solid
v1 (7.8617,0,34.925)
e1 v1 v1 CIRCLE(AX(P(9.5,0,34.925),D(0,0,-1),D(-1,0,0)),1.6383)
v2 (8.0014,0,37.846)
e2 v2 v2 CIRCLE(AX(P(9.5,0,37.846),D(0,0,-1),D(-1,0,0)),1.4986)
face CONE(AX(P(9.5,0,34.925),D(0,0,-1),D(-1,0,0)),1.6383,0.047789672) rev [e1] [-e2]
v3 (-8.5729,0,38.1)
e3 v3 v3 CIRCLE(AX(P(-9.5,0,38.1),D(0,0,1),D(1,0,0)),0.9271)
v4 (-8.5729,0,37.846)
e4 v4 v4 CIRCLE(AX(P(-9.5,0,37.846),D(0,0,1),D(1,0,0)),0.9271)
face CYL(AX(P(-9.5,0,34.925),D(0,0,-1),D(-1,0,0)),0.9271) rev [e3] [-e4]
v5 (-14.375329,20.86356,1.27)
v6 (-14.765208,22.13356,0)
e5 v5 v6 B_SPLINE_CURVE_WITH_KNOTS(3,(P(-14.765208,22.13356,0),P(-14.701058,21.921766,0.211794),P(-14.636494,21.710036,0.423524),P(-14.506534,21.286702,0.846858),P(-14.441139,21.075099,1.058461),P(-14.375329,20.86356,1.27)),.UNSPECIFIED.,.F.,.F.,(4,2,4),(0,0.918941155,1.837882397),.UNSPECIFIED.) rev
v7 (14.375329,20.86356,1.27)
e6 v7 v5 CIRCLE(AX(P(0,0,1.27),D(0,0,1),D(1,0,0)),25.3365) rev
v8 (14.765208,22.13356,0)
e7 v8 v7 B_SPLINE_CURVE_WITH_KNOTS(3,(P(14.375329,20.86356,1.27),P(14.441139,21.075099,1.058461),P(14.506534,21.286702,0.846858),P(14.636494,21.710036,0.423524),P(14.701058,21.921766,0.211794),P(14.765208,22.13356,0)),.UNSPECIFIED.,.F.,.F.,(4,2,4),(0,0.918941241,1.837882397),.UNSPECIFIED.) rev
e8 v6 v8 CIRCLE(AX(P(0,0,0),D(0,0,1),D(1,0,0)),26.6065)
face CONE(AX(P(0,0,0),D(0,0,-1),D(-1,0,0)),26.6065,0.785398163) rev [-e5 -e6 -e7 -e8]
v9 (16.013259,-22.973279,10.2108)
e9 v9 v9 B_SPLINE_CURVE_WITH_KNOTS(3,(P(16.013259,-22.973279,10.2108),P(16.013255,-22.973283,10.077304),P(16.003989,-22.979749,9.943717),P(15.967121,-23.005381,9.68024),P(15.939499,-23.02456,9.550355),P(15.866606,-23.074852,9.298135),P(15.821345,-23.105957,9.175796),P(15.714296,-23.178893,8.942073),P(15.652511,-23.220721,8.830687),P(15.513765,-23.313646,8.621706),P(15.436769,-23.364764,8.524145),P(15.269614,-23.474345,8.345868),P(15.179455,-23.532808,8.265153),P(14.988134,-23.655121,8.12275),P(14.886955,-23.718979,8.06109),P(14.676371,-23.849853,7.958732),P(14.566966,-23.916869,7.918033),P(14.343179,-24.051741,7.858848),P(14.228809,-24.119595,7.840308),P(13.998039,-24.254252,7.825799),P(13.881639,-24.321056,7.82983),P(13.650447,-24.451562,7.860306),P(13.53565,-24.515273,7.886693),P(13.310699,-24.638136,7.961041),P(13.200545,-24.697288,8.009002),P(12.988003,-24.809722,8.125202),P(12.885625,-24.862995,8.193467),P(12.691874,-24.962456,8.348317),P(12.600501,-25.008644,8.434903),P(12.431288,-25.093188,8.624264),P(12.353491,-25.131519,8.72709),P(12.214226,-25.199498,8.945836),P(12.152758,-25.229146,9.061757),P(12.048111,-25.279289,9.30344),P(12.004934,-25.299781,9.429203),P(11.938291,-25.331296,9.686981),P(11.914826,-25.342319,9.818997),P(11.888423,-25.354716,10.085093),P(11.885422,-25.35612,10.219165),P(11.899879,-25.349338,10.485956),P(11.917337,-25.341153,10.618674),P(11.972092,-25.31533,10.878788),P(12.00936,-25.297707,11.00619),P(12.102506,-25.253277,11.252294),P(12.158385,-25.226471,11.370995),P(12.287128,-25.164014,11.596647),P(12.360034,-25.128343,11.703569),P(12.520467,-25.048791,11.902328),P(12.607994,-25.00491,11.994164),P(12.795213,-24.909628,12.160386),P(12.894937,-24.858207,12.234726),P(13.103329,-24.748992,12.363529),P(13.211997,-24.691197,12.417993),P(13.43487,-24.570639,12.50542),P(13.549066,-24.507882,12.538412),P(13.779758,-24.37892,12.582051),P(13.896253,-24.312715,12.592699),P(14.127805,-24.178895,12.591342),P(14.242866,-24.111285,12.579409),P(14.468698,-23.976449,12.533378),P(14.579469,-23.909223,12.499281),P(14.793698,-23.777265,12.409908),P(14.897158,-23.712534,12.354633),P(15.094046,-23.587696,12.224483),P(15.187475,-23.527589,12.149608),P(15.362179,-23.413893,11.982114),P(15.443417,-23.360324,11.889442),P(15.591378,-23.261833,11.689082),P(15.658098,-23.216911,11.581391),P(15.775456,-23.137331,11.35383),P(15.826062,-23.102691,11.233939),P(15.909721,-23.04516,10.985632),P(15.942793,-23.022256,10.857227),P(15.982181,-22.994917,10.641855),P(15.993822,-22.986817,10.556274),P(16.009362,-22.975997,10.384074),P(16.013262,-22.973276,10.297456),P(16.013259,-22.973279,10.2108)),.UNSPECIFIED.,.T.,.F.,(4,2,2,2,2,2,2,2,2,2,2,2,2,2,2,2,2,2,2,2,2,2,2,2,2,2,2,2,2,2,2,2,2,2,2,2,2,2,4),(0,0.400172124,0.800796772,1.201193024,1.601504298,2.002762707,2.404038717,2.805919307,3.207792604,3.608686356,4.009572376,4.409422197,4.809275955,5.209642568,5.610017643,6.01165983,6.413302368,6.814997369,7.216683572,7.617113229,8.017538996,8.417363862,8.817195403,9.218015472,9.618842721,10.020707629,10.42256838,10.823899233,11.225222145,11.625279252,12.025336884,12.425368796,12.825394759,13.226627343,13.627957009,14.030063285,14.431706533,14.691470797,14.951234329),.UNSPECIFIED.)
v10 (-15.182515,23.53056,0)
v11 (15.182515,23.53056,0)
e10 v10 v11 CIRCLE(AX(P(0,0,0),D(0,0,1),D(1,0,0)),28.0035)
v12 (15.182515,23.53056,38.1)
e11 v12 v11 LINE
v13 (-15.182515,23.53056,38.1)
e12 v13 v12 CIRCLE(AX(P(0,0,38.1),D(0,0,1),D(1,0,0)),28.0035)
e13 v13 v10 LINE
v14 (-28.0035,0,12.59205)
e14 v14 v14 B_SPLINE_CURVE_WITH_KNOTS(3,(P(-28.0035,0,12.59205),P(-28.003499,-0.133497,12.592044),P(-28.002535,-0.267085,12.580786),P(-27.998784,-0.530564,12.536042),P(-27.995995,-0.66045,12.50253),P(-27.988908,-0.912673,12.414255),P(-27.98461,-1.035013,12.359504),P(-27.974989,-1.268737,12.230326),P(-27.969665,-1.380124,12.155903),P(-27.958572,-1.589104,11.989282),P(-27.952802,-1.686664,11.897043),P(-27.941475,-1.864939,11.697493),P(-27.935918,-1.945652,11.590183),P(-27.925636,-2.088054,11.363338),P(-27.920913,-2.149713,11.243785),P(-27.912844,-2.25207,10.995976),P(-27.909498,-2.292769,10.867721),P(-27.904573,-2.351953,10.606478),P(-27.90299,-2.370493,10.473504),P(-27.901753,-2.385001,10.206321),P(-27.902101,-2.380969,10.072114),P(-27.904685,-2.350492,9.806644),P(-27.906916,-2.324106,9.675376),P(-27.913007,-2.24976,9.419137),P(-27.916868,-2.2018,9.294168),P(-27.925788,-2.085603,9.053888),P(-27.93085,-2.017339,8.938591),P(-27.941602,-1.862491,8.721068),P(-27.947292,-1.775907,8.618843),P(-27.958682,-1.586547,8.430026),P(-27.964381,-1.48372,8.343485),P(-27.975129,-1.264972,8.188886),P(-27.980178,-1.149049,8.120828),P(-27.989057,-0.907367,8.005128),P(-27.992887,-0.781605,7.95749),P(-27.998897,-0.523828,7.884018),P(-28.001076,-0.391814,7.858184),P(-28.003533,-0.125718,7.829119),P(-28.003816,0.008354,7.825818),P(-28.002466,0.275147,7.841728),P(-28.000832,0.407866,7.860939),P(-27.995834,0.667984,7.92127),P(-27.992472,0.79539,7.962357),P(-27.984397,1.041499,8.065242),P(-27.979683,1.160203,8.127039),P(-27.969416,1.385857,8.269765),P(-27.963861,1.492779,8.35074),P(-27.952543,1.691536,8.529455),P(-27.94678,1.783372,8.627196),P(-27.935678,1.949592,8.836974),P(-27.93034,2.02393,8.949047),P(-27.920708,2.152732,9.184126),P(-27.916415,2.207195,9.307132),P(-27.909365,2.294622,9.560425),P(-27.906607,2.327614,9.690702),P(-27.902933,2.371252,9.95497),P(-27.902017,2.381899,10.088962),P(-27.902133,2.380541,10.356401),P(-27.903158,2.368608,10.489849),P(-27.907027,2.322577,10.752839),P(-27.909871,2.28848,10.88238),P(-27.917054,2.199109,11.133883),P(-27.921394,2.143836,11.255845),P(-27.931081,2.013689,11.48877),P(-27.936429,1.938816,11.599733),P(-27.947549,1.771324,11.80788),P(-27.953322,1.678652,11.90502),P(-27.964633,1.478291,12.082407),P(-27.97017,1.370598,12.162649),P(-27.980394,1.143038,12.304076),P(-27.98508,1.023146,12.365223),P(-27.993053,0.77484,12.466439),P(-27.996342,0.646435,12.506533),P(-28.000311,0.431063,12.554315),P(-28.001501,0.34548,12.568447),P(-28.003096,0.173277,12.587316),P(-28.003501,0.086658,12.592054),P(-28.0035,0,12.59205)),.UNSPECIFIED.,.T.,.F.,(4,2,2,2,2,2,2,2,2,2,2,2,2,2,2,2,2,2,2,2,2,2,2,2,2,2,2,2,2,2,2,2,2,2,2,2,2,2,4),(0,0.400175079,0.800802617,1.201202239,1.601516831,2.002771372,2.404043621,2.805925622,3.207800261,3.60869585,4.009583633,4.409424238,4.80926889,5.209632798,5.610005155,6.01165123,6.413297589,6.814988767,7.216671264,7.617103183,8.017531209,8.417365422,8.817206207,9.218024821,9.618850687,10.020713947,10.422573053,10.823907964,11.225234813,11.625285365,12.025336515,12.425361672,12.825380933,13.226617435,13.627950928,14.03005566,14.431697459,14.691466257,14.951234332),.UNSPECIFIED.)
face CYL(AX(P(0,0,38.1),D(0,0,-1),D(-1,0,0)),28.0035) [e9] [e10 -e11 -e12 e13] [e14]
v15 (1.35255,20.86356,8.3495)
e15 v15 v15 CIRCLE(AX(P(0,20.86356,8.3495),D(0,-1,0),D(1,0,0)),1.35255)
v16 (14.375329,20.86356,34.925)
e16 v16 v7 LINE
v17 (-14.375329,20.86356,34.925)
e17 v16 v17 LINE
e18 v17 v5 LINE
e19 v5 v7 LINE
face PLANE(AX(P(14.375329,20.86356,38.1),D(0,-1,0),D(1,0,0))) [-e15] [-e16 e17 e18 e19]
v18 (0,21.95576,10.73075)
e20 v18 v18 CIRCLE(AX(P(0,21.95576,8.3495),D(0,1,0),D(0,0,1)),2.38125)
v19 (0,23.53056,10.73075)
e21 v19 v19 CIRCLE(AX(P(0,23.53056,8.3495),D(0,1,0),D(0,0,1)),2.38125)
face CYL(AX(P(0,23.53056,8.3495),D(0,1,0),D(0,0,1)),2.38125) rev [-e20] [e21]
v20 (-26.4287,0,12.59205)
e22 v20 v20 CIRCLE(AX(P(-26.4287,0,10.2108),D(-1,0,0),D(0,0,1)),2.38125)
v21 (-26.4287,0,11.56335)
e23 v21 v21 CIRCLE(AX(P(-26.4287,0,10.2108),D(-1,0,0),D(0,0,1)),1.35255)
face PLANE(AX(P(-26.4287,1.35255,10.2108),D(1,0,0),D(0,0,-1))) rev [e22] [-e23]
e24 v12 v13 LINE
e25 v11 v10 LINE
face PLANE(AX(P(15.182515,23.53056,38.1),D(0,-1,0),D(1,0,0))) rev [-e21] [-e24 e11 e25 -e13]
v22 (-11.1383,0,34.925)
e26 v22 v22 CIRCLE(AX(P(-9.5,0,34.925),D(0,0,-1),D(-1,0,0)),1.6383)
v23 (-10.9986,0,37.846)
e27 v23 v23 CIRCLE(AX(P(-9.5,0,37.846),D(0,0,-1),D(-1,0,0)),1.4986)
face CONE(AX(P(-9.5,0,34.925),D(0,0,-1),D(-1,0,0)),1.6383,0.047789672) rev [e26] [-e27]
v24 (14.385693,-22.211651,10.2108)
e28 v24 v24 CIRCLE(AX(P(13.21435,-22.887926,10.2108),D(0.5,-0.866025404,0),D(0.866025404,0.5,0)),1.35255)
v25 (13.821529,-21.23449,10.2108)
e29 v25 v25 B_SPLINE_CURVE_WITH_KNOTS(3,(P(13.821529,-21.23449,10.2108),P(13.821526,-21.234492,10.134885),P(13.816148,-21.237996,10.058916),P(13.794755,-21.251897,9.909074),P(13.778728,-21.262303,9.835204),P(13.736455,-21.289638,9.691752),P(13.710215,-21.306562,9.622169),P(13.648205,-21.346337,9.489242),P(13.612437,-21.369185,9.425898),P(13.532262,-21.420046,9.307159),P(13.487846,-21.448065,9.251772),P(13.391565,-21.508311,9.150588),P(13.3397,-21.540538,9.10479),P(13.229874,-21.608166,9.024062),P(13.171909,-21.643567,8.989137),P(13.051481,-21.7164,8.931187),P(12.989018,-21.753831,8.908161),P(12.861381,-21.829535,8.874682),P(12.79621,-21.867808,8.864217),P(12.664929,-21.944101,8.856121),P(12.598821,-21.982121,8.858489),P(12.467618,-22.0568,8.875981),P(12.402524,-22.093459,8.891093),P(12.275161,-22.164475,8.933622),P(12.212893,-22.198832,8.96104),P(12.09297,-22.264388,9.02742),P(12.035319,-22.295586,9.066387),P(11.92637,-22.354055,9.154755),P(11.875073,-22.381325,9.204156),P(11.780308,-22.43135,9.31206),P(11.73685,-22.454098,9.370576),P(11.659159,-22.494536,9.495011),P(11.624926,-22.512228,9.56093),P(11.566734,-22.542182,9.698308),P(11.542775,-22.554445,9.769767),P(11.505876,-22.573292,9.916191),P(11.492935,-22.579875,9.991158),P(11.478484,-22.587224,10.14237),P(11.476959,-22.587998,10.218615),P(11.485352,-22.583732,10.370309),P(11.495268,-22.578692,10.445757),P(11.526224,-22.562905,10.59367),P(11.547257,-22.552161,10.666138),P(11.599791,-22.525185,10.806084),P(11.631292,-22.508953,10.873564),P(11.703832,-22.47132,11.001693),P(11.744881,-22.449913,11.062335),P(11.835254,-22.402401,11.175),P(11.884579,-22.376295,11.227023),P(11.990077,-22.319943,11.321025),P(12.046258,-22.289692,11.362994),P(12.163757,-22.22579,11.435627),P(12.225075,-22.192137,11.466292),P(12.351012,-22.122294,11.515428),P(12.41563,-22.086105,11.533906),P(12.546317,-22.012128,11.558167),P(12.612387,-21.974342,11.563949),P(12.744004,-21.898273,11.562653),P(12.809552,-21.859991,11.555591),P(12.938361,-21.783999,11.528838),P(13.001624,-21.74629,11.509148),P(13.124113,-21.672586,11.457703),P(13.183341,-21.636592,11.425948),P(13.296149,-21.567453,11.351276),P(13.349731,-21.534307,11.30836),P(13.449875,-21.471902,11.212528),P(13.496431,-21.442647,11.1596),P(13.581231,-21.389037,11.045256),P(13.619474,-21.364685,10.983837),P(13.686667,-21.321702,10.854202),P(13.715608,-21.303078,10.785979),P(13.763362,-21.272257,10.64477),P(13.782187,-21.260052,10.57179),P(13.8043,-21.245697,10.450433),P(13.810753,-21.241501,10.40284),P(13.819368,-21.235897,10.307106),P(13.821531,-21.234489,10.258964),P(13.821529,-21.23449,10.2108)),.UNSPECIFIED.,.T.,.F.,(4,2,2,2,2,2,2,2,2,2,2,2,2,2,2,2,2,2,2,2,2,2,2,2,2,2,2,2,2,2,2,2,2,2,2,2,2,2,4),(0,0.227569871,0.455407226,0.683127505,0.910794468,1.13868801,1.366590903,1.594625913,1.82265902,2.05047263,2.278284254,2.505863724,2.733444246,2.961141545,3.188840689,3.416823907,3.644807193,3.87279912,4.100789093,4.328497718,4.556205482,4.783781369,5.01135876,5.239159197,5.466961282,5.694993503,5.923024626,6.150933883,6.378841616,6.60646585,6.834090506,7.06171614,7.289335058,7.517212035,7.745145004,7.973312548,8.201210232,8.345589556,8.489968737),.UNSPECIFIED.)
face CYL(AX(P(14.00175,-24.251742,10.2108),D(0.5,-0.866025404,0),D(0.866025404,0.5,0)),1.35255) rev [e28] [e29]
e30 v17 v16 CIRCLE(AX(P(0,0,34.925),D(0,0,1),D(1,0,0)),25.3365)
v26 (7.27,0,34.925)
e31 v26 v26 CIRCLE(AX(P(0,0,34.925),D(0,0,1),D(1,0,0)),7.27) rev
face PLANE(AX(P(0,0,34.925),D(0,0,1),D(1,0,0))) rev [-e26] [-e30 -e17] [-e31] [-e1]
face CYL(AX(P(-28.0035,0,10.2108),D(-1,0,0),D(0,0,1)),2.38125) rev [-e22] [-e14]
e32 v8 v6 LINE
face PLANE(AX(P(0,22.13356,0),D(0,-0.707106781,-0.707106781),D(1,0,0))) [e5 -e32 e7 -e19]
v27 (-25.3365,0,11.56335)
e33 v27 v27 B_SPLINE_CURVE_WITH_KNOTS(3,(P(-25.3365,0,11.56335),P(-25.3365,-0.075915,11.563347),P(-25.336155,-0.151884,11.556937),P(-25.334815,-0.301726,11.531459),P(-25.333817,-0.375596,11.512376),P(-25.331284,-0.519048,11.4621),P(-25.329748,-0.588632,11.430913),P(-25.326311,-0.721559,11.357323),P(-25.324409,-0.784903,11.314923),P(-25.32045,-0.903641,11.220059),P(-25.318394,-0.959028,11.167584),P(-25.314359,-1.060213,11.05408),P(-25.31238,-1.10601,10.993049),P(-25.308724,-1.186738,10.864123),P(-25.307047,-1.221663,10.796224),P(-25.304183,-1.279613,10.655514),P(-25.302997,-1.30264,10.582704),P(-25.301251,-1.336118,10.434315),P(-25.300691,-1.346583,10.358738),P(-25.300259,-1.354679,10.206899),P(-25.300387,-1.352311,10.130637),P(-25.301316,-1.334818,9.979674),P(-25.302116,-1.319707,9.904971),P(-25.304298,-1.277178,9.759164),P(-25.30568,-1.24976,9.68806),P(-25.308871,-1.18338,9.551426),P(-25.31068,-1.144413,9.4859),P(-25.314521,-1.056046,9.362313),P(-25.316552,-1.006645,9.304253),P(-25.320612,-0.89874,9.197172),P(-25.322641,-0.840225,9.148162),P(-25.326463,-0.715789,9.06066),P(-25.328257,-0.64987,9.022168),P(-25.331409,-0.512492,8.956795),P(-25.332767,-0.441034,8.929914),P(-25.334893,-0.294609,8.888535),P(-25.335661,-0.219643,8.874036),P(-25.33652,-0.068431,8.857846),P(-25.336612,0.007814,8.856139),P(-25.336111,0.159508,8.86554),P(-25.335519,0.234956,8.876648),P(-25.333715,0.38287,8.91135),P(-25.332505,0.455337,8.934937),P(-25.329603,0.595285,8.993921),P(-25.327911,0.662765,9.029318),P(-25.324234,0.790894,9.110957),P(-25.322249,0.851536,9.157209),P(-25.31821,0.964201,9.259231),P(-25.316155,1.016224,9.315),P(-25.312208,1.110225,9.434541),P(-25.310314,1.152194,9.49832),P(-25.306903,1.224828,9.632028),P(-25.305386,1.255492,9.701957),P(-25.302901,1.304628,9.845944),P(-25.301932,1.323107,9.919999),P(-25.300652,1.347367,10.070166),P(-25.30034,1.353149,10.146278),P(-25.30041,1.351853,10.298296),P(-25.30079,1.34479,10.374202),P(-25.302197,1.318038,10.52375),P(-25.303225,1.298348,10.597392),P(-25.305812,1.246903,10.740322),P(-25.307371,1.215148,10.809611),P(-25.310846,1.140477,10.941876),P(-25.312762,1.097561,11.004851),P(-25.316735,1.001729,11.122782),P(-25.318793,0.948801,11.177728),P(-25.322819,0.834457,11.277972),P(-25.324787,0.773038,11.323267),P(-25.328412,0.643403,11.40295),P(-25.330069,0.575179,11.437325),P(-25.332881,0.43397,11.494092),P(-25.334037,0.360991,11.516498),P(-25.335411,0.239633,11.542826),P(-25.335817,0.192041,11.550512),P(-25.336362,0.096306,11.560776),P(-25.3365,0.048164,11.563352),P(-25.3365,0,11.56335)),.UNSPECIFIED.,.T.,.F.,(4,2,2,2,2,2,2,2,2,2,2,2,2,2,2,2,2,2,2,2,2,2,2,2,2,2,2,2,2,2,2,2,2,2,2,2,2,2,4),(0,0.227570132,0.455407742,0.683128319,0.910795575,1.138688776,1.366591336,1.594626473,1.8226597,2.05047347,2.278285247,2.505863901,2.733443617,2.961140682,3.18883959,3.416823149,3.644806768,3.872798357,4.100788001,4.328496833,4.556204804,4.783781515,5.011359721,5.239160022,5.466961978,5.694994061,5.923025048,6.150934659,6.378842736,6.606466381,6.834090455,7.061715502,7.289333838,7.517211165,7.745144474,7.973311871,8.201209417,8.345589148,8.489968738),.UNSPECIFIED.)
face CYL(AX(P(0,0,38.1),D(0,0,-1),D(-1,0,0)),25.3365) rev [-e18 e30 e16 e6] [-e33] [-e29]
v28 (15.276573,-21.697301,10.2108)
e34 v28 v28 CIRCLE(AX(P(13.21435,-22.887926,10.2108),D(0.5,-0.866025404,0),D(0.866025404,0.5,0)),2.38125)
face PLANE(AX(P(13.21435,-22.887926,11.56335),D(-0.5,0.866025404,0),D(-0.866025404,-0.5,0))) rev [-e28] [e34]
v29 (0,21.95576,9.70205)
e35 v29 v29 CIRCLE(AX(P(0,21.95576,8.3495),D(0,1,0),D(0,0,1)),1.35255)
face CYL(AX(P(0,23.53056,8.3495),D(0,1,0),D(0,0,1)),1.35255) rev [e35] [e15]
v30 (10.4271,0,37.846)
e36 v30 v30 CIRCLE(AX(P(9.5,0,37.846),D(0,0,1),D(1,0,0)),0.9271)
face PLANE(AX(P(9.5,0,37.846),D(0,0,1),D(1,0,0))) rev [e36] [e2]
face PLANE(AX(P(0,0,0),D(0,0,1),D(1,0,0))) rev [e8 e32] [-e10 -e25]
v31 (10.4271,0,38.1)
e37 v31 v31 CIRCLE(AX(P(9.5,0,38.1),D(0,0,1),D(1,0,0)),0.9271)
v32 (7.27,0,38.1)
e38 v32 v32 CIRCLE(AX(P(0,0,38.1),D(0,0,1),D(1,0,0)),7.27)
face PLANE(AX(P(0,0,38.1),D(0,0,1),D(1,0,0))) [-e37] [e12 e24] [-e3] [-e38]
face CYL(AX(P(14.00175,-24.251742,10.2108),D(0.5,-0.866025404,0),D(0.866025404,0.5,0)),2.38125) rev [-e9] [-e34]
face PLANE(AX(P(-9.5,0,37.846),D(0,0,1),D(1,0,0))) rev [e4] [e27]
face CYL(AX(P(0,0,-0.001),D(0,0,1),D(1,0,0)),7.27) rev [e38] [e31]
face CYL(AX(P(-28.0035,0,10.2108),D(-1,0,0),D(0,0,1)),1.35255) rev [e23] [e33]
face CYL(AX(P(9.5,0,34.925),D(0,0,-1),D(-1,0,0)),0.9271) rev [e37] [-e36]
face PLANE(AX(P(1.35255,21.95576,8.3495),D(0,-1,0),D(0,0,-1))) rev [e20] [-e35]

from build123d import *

# Parameters (mm, degrees)
BOSS_EXTRUDE1_DEPTH                             = 38.1
BOSS_EXTRUDE2_START                             = -3.175
BOSS_EXTRUDE2_DEPTH                             = 3.175
CBORE_FOR_2_PAN_HEAD_MACHINE_SCREW1_D           = 2.7051
CBORE_FOR_2_PAN_HEAD_MACHINE_SCREW1_DEPTH       = 2.667
CBORE_FOR_2_PAN_HEAD_MACHINE_SCREW1_CBORE_D     = 4.7625
CBORE_FOR_2_PAN_HEAD_MACHINE_SCREW1_CBORE_DEPTH = 1.5748
CBORE_START                                     = 26.4287
CBORE_FOR_2_PAN_HEAD_MACHINE_SCREW2_OUT_R       = 2.38125
CBORE_FOR_2_PAN_HEAD_MACHINE_SCREW2_DEPTH       = 1.574800075
CBORE_START_2                                   = 25.300372244
CBORE_FOR_2_PAN_HEAD_MACHINE_SCREW2_2_O_R       = 1.35255
CBORE_FOR_2_PAN_HEAD_MACHINE_SCREW2_2_DEPTH     = 1.128327756
CBORE_START_3                                   = -28.003500101
CBORE_FOR_2_PAN_HEAD_MACHINE_SCREW3_OUT_R       = 2.38125
CBORE_FOR_2_PAN_HEAD_MACHINE_SCREW3_DEPTH       = 1.574800101
CBORE_START_4                                   = -26.4287
CBORE_FOR_2_PAN_HEAD_MACHINE_SCREW3_2_O_R       = 1.35255
CBORE_FOR_2_PAN_HEAD_MACHINE_SCREW3_2_DEPTH     = 1.128327733
CUT_EXTRUDE1_REACH                              = 56.955
SKETCH20_R                                      = 7.27
HOLE1_AT_2_COUNT                                = 2
HOLE1_AT_2_PITCH                                = 19
F_0_CLEARANCE_HOLE1_D                           = 1.8542
CHAMFER1_SIZE                                   = 1.27


# Read off the part's stored shape, not the designer's step: CBORE for #2 Pan Head Machine Screw2, CBORE for #2 Pan Head Machine Screw3
with BuildPart() as part:
    # Sketch1 → Boss-Extrude1 (new body)
    with BuildSketch(Plane.XY):
        with BuildLine():
            Line((15.182514888, 23.53056), (-15.182514888, 23.53056))
            ThreePointArc((-15.182514888, 23.53056), (0, -28.0035), (15.182514888, 23.53056))
        make_face()
        with BuildLine():
            Line((14.375329435, 20.86356), (-14.375329435, 20.86356))
            ThreePointArc((-14.375329435, 20.86356), (0, -25.3365), (14.375329435, 20.86356))
        make_face(mode=Mode.SUBTRACT)
    extrude(amount=BOSS_EXTRUDE1_DEPTH)

    # Sketch10 → Boss-Extrude2 (add)
    with BuildSketch(Plane.XY.offset(38.1).offset(BOSS_EXTRUDE2_START)):
        with BuildLine():
            Line((15.182514888, 23.53056), (-15.182514888, 23.53056))
            ThreePointArc((-15.182514888, 23.53056), (0, -28.0035), (15.182514888, 23.53056))
        make_face()
    extrude(amount=BOSS_EXTRUDE2_DEPTH)

    # CBORE for #2 Pan Head Machine Screw1
    with Locations(Plane(origin=(-7.747359339, 23.53056, 10.2108), x_dir=(0, 0, -1), z_dir=(0, 1, 0))):
        with Locations((1.8613, -7.747359339)):
            CounterBoreHole(CBORE_FOR_2_PAN_HEAD_MACHINE_SCREW1_D / 2, CBORE_FOR_2_PAN_HEAD_MACHINE_SCREW1_CBORE_D / 2, CBORE_FOR_2_PAN_HEAD_MACHINE_SCREW1_CBORE_DEPTH, depth=CBORE_FOR_2_PAN_HEAD_MACHINE_SCREW1_DEPTH)

    # CBORE for #2 Pan Head Machine Screw2 out → CBORE for #2 Pan Head Machine Screw2 (cut)
    with BuildSketch(Plane(origin=(0, 0, 0), x_dir=(0.8660254037844416, 0.4999999999999948, 0), z_dir=(0.4999999999999948, -0.8660254037844417, 0)).offset(CBORE_START)):
        with Locations((0, 10.2108)):
            Circle(CBORE_FOR_2_PAN_HEAD_MACHINE_SCREW2_OUT_R)
    extrude(amount=CBORE_FOR_2_PAN_HEAD_MACHINE_SCREW2_DEPTH, mode=Mode.SUBTRACT)

    # CBORE for _2 Pan Head Machine Screw2 2 o → CBORE for _2 Pan Head Machine Screw2 2 (cut)
    with BuildSketch(Plane(origin=(0, 0, 0), x_dir=(0.8660254037844416, 0.4999999999999948, 0), z_dir=(0.4999999999999948, -0.8660254037844417, 0)).offset(CBORE_START_2)):
        with Locations((0, 10.2108)):
            Circle(CBORE_FOR_2_PAN_HEAD_MACHINE_SCREW2_2_O_R)
    extrude(amount=CBORE_FOR_2_PAN_HEAD_MACHINE_SCREW2_2_DEPTH, mode=Mode.SUBTRACT)

    # CBORE for #2 Pan Head Machine Screw3 out → CBORE for #2 Pan Head Machine Screw3 (cut)
    with BuildSketch(Plane.YZ.offset(CBORE_START_3)):
        with Locations((0, 10.2108)):
            Circle(CBORE_FOR_2_PAN_HEAD_MACHINE_SCREW3_OUT_R)
    extrude(amount=CBORE_FOR_2_PAN_HEAD_MACHINE_SCREW3_DEPTH, mode=Mode.SUBTRACT)

    # CBORE for _2 Pan Head Machine Screw3 2 o → CBORE for _2 Pan Head Machine Screw3 2 (cut)
    with BuildSketch(Plane.YZ.offset(CBORE_START_4)):
        with Locations((0, 10.2108)):
            Circle(CBORE_FOR_2_PAN_HEAD_MACHINE_SCREW3_2_O_R)
    extrude(amount=CBORE_FOR_2_PAN_HEAD_MACHINE_SCREW3_2_DEPTH, mode=Mode.SUBTRACT)

    # Sketch20 → Cut-Extrude1 (cut, up to next)
    with BuildSketch(Plane.XY.offset(38.1), mode=Mode.PRIVATE) as cut_extrude1_sk1:
        Circle(SKETCH20_R)
    cut_extrude1_tool1 = extrude(cut_extrude1_sk1.sketch, amount=-CUT_EXTRUDE1_REACH, mode=Mode.PRIVATE) & part.part
    add(cut_extrude1_tool1.solids().sort_by_distance((0, 0, 38.1))[0], mode=Mode.SUBTRACT)

    # Sketch22 → Hole1 (revolve, cut)
    with BuildSketch(Plane(origin=(9.5, 0, 34.925), x_dir=(0, 1, 0), z_dir=(1, 0, 0))):
        Polygon((0, 0), (0, 2.921), (1.4986, 2.921), (1.6383, 0), align=None)
    hole1 = revolve(axis=Axis((9.5, 0, 144.925), (0, 0, -1)), mode=Mode.SUBTRACT)

    # Hole1 at 2: Hole1 ×2
    with Locations(*[(-i * HOLE1_AT_2_PITCH, 0, 0) for i in range(1, HOLE1_AT_2_COUNT)]):
        add(hole1, mode=Mode.SUBTRACT)

    # #0 Clearance Hole1 (through all)
    with Locations(Plane(origin=(0, 0, 34.925), x_dir=(-1, 0, 0), z_dir=(0, 0, -1))):
        with Locations((-9.5, 0), (9.5, 0)):
            Hole(F_0_CLEARANCE_HOLE1_D / 2)

    # Chamfer1
    chamfer1_edges = [part.edges().sort_by_distance(p)[0] for p in [
        (0, -25.3365, 0),
        (0, 20.86356, 0),
    ]]
    chamfer(chamfer1_edges, length=CHAMFER1_SIZE)


solid = part.part
